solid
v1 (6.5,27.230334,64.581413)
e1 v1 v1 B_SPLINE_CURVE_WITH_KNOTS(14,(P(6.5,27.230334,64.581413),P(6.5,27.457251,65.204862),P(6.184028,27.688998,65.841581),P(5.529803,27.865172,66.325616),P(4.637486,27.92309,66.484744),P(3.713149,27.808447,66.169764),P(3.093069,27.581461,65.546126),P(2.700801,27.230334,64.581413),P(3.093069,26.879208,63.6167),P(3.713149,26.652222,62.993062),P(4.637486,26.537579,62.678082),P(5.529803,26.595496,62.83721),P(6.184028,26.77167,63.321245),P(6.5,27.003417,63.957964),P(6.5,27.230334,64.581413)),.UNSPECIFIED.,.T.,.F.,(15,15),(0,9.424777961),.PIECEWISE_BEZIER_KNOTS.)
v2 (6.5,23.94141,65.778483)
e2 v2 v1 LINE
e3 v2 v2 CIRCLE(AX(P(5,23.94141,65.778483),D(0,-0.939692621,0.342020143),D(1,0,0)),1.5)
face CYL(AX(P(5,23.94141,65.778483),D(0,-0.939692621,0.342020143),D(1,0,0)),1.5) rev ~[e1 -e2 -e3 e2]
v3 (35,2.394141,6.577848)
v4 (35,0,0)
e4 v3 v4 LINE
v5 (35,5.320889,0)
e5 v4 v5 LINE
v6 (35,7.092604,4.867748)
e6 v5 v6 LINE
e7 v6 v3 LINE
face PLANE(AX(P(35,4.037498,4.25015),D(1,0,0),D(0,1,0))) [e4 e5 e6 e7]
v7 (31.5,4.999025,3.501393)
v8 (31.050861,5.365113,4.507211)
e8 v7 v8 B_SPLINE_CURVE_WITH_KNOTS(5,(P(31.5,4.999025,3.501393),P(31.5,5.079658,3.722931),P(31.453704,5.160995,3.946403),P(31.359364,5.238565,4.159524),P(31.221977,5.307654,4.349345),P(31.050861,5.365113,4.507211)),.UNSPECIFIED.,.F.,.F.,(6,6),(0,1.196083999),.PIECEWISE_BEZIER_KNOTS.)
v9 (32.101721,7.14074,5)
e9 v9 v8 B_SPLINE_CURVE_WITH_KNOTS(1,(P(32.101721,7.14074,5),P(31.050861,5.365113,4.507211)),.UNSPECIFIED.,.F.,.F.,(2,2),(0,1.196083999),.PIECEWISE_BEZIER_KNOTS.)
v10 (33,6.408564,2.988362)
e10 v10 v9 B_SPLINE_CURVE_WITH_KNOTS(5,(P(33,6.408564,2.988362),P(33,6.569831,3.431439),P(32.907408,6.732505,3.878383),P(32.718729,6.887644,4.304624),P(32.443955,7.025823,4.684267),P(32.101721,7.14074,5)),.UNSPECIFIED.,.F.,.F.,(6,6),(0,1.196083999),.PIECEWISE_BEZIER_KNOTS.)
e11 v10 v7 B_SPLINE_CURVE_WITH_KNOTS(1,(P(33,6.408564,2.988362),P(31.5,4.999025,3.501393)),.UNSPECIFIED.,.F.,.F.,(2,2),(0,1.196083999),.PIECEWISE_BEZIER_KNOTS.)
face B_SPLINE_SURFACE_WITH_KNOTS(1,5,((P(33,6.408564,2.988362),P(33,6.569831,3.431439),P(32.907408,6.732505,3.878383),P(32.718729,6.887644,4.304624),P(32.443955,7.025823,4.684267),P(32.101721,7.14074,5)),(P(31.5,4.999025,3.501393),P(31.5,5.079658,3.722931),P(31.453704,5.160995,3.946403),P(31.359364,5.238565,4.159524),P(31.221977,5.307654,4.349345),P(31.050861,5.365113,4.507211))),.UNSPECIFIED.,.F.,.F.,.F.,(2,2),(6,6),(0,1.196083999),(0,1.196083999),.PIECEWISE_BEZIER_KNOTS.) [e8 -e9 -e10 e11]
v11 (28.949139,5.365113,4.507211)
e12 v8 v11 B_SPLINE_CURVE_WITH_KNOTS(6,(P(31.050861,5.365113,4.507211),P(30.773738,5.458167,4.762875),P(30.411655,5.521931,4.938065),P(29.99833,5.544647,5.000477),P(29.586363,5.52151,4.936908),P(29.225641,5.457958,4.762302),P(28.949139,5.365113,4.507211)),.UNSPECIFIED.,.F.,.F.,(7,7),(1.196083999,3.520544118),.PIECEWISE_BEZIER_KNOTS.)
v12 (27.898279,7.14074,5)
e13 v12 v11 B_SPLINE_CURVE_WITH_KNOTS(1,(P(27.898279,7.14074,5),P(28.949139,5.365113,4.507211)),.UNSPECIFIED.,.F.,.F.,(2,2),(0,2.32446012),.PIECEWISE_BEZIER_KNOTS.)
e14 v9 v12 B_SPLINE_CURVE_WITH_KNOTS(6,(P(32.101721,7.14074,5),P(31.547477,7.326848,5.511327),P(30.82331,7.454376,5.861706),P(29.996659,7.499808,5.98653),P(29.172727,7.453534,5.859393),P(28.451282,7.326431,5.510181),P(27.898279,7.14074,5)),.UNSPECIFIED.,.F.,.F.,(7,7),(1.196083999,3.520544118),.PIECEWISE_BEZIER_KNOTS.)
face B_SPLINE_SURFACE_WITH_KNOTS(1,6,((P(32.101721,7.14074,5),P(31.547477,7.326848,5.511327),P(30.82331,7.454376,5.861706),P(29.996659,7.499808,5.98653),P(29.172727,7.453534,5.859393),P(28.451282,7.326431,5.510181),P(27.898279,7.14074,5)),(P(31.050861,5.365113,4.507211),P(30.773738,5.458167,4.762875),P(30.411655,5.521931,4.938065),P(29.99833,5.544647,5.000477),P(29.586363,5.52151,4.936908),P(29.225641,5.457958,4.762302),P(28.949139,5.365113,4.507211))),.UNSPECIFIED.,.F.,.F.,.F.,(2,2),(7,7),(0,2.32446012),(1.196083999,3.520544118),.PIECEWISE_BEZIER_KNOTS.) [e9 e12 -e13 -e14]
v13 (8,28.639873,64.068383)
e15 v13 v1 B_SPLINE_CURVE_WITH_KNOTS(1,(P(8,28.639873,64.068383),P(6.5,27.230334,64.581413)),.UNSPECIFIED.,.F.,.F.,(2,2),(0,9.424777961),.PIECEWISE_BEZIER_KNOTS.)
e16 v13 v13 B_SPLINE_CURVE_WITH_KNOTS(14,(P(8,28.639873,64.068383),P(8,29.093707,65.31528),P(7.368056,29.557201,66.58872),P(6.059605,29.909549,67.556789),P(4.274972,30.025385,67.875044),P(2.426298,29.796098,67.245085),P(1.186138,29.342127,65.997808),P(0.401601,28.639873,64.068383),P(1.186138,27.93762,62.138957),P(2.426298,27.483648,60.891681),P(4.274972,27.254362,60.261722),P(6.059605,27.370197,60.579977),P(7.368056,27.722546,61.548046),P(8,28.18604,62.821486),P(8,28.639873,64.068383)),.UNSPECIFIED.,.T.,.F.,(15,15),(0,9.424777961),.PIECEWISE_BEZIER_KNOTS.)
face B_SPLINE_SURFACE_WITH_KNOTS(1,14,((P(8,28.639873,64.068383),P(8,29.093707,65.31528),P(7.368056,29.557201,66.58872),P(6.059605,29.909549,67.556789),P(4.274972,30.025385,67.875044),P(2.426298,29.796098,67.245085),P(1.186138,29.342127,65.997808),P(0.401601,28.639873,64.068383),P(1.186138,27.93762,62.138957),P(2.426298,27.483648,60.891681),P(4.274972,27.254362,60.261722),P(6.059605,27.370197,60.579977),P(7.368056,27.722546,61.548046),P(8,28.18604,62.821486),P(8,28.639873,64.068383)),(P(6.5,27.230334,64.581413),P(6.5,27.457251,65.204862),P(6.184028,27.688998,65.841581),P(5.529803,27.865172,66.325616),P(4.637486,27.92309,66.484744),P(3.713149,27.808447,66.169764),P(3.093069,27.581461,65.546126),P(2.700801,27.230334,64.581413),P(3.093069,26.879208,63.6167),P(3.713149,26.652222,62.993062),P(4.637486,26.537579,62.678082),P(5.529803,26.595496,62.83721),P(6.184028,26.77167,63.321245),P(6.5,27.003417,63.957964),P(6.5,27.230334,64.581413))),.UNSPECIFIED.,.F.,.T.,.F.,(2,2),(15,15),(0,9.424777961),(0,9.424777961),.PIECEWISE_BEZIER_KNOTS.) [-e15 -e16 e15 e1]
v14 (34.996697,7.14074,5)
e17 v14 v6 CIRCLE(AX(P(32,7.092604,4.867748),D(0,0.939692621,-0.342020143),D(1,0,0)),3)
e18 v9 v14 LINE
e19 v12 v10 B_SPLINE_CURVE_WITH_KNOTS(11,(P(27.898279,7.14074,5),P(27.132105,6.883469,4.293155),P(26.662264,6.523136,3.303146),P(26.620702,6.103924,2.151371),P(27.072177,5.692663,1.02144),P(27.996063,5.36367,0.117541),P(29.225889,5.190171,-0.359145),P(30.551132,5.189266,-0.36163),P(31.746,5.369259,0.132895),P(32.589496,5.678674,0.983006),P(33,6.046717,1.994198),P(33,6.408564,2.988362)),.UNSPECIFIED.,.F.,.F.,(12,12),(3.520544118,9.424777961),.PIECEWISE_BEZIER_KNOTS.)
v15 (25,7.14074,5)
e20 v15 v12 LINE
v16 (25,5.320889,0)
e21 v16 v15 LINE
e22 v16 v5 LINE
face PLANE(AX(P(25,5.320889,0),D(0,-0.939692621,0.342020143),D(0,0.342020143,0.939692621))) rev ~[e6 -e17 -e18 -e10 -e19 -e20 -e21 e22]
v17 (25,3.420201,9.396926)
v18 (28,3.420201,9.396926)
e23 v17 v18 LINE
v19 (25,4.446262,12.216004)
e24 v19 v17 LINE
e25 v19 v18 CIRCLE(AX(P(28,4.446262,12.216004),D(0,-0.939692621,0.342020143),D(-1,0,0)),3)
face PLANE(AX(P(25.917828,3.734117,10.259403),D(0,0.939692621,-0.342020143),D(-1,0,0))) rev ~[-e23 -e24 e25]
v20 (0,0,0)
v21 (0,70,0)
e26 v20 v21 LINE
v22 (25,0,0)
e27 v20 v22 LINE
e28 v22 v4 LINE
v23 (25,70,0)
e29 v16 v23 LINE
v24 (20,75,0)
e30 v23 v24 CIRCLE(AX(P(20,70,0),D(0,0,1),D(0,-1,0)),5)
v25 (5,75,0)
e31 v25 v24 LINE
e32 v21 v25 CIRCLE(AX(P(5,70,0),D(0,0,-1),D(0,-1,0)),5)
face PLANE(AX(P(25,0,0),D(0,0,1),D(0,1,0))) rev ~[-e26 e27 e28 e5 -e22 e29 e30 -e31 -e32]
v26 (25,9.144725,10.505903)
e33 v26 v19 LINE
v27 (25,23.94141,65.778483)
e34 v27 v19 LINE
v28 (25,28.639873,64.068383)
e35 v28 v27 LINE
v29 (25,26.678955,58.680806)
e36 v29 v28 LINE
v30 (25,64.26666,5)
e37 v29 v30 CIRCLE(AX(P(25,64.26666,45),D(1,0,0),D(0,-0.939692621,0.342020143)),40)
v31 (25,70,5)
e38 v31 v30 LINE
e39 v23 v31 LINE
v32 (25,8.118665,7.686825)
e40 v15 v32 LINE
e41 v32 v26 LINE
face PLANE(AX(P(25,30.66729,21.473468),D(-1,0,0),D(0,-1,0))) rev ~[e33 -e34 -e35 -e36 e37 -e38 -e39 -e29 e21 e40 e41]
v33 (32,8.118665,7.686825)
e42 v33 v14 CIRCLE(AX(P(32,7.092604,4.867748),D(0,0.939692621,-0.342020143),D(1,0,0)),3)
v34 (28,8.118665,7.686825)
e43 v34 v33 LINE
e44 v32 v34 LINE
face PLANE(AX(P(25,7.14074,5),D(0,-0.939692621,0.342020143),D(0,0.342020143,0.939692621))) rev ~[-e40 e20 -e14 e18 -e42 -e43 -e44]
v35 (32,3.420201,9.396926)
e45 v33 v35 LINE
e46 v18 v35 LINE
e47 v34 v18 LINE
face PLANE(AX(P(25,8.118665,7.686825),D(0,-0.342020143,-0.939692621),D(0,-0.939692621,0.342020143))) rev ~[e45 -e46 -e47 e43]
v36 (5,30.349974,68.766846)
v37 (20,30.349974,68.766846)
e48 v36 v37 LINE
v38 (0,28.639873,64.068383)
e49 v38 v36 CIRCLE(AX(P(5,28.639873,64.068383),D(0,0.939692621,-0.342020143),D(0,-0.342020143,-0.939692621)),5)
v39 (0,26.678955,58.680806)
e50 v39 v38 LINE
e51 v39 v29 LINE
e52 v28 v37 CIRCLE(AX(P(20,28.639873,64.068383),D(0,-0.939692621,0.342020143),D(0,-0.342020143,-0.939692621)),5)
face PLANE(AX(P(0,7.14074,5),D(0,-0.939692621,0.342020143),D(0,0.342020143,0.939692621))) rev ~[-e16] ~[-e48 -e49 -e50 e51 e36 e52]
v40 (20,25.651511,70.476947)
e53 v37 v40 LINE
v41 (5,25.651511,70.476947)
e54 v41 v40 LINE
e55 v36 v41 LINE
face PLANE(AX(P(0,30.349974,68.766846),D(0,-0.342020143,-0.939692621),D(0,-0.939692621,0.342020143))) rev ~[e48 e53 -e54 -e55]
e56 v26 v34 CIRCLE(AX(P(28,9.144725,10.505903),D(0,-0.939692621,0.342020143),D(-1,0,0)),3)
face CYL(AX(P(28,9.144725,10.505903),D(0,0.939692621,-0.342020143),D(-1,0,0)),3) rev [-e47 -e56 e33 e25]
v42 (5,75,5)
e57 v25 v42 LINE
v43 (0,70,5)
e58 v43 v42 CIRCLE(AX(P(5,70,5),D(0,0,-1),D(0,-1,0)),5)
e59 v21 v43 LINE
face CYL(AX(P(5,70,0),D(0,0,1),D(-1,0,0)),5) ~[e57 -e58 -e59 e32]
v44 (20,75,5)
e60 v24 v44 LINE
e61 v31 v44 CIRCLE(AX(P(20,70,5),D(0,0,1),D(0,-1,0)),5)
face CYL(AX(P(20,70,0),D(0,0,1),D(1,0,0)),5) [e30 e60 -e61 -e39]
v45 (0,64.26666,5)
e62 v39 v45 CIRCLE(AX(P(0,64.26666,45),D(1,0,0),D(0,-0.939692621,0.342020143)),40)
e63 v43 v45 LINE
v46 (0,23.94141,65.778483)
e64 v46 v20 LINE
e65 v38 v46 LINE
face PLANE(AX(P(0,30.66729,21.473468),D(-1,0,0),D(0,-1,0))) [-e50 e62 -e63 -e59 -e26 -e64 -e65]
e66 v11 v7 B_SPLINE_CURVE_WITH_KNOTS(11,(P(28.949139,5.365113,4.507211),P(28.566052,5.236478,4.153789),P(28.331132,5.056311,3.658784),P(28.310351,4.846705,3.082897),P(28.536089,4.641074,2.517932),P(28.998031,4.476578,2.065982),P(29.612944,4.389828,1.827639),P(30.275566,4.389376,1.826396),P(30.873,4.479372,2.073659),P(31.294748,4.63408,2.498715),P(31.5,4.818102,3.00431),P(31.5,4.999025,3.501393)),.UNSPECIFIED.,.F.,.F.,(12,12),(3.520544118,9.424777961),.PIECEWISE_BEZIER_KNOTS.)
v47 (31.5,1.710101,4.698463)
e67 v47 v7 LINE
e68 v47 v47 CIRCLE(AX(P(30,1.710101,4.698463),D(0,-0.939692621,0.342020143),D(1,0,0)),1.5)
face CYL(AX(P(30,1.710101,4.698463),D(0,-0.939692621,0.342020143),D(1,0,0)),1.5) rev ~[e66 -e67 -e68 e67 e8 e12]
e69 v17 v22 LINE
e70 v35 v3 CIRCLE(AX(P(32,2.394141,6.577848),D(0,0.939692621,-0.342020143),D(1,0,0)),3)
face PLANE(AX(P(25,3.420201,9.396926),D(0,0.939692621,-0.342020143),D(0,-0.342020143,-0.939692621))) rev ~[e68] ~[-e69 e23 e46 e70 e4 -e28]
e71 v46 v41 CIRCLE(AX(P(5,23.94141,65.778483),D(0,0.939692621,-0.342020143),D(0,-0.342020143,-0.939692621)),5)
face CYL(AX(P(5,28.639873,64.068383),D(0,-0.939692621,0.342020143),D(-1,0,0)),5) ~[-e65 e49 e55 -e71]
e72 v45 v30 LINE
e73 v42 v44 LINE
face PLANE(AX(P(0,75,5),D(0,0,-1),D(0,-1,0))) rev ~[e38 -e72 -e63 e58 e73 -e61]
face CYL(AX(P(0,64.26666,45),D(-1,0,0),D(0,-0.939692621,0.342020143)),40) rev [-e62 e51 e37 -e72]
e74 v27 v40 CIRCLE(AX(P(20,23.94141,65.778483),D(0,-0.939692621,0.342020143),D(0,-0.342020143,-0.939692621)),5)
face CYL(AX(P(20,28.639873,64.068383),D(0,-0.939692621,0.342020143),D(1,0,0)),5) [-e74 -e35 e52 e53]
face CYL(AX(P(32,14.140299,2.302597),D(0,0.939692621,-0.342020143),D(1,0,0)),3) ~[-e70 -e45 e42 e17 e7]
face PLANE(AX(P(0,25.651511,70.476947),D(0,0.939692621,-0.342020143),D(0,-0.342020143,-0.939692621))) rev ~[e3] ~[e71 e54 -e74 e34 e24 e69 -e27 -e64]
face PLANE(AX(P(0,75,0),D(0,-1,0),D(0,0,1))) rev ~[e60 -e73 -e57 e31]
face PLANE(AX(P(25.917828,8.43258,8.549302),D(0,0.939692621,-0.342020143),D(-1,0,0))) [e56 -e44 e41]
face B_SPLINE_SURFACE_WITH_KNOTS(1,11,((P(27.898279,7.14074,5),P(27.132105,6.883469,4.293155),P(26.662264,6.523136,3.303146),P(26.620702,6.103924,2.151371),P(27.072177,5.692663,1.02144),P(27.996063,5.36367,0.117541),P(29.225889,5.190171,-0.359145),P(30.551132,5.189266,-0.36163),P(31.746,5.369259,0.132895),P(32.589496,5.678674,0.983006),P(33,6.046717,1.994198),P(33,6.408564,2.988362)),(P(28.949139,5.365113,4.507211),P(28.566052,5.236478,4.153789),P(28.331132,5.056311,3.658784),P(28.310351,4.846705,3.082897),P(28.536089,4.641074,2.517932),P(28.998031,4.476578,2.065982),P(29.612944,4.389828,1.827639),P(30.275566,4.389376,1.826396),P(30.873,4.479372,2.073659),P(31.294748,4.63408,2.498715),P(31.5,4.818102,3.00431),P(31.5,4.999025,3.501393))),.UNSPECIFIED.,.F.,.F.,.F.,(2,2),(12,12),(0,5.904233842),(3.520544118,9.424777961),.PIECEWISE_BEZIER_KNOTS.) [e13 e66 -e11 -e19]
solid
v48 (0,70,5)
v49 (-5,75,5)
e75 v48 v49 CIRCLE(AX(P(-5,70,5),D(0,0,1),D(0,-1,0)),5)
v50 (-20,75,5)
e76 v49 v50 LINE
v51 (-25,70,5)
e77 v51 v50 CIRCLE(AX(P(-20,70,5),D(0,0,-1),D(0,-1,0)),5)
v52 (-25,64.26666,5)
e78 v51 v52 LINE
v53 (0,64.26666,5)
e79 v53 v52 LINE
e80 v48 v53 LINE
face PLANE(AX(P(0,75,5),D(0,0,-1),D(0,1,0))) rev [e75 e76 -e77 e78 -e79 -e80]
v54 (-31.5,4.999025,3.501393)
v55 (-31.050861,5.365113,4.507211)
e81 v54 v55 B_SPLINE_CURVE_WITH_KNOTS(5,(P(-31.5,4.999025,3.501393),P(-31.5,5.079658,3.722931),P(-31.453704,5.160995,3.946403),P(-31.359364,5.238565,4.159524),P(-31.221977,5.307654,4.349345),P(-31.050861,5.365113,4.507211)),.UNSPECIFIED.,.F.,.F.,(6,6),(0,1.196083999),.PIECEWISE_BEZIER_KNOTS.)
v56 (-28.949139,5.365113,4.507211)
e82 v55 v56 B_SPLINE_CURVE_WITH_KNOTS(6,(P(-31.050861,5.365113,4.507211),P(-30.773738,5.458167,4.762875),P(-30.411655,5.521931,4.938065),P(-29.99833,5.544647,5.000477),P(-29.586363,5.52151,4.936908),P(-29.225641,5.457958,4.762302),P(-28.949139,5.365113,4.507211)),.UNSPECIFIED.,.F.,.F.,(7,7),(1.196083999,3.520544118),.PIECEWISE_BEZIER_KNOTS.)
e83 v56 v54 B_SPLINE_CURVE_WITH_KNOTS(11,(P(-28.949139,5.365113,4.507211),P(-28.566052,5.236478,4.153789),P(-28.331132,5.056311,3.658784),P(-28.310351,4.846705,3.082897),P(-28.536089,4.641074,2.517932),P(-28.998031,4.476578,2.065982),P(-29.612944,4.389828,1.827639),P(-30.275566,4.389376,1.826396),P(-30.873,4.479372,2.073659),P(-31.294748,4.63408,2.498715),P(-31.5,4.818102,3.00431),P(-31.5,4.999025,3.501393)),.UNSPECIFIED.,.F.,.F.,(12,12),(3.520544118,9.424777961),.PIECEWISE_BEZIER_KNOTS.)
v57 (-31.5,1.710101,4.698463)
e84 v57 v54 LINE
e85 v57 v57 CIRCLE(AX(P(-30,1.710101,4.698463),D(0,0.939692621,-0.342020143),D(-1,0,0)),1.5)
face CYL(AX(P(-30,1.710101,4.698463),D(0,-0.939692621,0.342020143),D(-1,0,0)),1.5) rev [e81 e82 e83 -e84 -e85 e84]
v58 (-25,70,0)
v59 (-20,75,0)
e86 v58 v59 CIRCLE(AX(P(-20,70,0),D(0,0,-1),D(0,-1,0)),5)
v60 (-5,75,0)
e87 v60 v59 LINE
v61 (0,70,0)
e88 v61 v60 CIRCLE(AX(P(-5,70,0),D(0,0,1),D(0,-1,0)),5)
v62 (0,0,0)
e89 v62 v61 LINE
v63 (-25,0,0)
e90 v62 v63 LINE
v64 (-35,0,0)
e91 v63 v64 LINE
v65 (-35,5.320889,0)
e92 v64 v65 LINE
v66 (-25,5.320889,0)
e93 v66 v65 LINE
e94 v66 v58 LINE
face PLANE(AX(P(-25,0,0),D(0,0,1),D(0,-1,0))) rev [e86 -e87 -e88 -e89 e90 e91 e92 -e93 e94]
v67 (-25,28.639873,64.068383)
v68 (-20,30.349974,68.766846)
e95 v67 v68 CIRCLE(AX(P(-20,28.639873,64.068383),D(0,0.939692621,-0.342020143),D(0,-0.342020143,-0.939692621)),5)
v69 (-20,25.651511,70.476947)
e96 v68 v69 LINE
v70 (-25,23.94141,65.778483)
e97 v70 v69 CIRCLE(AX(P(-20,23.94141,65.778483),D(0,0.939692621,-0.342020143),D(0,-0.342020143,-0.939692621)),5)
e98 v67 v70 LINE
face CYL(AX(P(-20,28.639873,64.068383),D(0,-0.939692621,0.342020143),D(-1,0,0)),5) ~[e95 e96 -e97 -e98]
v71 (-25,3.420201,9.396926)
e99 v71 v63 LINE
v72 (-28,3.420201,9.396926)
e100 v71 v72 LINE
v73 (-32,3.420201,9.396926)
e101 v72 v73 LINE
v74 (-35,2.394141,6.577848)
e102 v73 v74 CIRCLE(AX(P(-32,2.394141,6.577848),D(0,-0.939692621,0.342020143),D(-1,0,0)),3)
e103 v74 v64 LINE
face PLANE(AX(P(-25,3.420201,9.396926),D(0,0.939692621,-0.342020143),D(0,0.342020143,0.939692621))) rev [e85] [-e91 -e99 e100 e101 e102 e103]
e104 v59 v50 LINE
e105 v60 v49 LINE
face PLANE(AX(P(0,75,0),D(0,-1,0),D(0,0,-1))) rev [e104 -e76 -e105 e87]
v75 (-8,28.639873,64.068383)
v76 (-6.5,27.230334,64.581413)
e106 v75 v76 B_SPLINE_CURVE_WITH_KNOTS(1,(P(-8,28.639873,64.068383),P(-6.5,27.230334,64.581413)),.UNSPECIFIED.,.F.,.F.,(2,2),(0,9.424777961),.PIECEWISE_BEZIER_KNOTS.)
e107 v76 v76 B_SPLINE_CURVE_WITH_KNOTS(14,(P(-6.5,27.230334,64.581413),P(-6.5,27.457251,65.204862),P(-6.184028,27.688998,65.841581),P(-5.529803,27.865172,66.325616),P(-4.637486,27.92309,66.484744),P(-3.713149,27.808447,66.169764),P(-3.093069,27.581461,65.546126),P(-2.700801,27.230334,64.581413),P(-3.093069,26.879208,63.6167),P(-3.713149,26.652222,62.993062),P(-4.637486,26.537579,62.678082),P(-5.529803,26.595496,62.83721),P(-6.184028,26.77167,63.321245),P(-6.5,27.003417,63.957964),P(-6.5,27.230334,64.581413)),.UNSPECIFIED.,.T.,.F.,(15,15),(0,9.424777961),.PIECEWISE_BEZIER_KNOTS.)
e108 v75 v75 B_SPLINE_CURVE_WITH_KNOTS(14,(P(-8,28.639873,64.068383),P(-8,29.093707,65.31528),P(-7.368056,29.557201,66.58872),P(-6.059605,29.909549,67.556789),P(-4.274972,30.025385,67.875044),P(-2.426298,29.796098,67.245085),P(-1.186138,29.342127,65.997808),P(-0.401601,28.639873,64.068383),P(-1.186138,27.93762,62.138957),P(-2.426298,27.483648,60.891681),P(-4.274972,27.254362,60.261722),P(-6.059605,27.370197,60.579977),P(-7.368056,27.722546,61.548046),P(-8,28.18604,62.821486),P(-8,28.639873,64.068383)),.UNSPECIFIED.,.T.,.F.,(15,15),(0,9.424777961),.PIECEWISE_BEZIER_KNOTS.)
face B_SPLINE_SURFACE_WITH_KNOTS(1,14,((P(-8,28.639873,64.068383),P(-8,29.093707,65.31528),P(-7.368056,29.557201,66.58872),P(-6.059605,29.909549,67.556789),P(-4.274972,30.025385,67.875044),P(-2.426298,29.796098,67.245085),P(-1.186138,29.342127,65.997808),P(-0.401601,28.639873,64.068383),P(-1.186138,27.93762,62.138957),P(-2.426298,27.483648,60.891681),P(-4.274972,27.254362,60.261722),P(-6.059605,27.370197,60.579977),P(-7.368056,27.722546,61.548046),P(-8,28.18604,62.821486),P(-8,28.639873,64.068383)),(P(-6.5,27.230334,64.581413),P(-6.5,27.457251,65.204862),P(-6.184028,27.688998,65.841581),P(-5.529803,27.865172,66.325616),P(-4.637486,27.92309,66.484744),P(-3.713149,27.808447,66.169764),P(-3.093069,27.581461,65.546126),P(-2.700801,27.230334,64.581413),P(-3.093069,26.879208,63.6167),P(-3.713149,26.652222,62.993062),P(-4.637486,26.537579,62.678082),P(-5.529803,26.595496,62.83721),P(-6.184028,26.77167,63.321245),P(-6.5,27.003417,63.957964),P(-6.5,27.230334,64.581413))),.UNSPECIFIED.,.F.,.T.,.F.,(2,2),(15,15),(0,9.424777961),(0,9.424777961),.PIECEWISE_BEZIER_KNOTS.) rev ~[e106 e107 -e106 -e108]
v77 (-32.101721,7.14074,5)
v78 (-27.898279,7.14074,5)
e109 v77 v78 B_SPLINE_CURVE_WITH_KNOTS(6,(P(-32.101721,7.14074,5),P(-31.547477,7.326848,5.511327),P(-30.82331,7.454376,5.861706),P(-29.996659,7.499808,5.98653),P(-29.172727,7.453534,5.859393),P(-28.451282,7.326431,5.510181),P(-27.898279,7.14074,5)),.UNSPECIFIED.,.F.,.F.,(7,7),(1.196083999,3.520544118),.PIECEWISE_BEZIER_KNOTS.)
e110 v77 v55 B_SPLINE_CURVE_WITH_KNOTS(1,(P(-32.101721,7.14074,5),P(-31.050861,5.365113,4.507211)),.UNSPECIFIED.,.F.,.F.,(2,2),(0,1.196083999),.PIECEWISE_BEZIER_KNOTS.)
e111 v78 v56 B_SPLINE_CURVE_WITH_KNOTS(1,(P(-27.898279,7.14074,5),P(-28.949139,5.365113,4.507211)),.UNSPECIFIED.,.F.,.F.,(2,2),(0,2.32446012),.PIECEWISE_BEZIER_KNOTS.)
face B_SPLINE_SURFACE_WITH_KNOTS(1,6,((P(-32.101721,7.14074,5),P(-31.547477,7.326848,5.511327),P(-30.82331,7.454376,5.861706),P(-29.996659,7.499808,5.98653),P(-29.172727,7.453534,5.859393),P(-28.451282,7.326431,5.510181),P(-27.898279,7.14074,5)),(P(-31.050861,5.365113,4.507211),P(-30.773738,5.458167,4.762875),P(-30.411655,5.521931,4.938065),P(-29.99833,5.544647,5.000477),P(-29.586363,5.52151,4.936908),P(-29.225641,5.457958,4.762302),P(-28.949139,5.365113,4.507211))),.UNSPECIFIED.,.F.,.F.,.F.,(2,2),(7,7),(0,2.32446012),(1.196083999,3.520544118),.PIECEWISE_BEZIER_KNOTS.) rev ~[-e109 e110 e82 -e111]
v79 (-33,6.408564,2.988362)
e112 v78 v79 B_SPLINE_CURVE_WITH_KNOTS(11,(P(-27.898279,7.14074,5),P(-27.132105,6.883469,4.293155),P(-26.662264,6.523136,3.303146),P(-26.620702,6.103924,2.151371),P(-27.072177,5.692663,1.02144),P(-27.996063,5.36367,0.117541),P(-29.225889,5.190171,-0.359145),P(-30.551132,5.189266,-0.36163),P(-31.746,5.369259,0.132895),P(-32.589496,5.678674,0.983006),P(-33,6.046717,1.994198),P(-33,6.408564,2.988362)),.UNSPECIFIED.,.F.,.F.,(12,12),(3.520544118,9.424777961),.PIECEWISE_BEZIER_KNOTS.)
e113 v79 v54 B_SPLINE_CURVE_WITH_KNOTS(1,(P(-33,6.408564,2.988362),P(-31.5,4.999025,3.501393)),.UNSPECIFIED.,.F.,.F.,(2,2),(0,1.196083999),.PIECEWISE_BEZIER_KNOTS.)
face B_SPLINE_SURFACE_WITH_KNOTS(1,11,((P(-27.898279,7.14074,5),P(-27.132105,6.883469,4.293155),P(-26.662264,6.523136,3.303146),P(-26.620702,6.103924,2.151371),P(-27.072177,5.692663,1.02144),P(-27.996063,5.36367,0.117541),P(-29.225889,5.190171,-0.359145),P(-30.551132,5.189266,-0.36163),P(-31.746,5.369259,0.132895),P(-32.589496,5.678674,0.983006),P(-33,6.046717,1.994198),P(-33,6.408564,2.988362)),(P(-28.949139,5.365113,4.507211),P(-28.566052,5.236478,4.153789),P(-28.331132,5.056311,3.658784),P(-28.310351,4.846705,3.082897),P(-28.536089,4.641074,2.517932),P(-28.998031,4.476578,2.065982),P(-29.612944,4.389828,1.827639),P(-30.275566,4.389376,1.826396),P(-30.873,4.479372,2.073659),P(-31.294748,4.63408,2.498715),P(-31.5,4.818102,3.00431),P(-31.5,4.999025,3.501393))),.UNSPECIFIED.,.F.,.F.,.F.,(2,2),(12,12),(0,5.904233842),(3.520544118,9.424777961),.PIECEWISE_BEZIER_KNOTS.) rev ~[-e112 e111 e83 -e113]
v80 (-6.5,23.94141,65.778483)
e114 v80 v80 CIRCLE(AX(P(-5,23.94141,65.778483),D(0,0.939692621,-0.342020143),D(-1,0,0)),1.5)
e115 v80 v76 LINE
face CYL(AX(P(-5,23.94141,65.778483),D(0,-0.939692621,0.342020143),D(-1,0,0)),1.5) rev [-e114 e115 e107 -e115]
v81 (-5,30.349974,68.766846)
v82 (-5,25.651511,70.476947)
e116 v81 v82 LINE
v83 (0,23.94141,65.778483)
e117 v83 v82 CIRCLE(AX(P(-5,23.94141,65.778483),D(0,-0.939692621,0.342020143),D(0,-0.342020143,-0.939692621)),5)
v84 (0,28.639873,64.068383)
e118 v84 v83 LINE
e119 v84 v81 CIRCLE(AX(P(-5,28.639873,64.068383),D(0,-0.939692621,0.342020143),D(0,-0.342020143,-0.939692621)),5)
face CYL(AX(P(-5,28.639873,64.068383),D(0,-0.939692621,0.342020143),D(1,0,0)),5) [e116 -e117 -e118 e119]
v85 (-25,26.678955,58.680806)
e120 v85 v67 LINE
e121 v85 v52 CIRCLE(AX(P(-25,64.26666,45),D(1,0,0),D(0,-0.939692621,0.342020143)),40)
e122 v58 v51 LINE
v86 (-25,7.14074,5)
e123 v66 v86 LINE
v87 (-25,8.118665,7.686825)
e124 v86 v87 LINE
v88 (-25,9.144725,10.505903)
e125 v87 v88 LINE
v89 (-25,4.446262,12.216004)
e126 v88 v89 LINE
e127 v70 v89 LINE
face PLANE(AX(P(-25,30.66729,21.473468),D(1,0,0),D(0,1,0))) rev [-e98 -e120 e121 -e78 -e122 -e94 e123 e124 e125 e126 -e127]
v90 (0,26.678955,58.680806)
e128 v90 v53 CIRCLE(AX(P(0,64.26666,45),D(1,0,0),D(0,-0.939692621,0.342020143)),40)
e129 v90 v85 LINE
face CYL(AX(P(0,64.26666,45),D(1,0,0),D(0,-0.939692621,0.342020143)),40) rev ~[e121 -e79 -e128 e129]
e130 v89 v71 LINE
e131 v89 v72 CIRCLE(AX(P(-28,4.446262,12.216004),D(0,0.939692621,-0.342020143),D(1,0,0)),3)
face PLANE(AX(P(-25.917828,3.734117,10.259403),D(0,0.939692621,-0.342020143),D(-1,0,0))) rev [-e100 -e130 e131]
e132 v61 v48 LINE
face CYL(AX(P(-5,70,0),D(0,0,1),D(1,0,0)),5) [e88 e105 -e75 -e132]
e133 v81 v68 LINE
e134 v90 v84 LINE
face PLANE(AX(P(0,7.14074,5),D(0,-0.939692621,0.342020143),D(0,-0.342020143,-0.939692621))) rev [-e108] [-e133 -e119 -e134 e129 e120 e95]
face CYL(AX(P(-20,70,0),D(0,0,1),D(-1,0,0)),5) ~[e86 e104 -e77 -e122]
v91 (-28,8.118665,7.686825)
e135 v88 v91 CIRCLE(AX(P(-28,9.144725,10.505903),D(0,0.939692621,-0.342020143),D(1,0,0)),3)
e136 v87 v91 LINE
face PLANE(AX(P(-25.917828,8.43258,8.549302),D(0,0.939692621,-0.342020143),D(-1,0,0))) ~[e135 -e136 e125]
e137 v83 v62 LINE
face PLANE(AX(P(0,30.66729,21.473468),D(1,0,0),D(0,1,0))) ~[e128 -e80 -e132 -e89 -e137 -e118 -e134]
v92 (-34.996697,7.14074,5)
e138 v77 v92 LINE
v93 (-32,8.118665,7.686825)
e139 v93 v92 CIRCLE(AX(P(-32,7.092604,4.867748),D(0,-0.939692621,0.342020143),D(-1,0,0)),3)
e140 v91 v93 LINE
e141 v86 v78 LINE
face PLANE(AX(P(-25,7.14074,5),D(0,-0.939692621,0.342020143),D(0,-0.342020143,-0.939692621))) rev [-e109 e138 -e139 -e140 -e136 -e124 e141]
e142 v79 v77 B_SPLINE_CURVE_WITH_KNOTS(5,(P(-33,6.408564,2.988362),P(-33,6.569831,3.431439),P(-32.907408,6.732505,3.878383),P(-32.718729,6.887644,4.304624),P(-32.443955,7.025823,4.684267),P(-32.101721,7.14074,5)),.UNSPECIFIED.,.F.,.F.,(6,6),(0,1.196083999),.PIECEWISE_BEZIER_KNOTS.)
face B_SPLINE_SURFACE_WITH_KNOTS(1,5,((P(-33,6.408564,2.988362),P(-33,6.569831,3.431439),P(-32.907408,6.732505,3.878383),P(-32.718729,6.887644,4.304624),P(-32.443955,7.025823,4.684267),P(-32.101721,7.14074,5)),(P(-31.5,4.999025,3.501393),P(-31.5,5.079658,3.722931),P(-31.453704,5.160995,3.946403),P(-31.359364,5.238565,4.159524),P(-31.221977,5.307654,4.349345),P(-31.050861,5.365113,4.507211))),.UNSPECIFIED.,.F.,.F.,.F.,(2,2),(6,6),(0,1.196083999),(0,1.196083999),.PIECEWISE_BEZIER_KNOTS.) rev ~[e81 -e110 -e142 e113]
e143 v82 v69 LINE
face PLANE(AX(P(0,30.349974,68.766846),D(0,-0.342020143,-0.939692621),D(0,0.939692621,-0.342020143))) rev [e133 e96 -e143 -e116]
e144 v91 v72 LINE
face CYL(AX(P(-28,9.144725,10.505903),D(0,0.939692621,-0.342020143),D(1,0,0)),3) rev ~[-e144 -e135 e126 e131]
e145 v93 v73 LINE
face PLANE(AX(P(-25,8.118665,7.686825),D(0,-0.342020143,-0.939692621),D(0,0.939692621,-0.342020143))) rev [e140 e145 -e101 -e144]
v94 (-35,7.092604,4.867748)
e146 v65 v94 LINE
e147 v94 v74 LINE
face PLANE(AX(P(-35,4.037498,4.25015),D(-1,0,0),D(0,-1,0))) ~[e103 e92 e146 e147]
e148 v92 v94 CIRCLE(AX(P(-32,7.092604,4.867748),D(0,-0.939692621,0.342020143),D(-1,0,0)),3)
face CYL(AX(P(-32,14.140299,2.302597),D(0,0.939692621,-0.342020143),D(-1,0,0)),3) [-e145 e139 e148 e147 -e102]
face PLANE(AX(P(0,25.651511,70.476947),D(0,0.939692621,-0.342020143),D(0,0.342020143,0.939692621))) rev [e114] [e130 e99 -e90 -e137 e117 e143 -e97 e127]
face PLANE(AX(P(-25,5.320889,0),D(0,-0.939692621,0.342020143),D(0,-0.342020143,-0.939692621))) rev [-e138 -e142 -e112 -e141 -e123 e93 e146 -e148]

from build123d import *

# Parameters (mm, degrees)
F1_DEPTH    = 25
F3_DEPTH    = 10
F4_R        = 1.5
F5_DEPTH    = 25
F6_SIZE     = 1.5
F7_T1_DEPTH = 25
F8_R        = 5
F9_T1_DEPTH = 5
F9_T3_DEPTH = 20


# Not quite as in the source:
# - a fillet or chamfer that OpenCascade refuses, or shapes differently, is made with other operations: its cross-section is extruded or revolved along the edge and cut away or added
# - a feature names something its author has since deleted; it is built from what else it names


with BuildPart() as f1:
    # F0 (on Right) → F1 (new body)
    with BuildSketch(Plane.YZ):
        Polygon((25.6515107494, 70.4769465589), (0, 0), (75, 0), (75, 5), (7.1407400337, 5), (30.3499738534, 68.7668458423), align=None)
    extrude(amount=F1_DEPTH)

    # F2 (on face) → F3 (join)
    with BuildSketch(Plane.YZ.offset(25)):
        Polygon((8.1186645372, 7.6868254912), (3.4202014333, 9.3969262079), (0, 0), (5.3208888624, 0), (7.1407400337, 5), align=None)
    extrude(amount=F3_DEPTH)

    # F4 (on face) → F5 (cut)
    with BuildSketch(Plane(origin=(0, 0, 0), x_dir=(1, 0, 0), z_dir=(0, -0.9396926208, 0.3420201433))):
        with Locations((30, 5)):
            Circle(F4_R)
        with Locations((5, 70)):
            Circle(F4_R)
    extrude(amount=-F5_DEPTH, mode=Mode.SUBTRACT)

    # F6
    f6_edges = [f1.edges().sort_by_distance(p)[0] for p in [
        (28.5, 6.408564, 2.988362),
        (3.5, 28.639873, 64.068383),
    ]]
    chamfer(f6_edges, length=F6_SIZE)

    # F7: fillet of radius 40 on 1 edges, made by hand

    # F7_s2 → F7_t1 (join)
    with BuildSketch(Plane.YZ):
        with BuildLine():
            ThreePointArc((26.678955472, 58.680805733), (31.5005785318, 22.056942546), (64.2666603034, 5))
            Line((64.2666603034, 5), (7.1407400337, 5))
            Line((7.1407400337, 5), (26.678955472, 58.680805733))
        make_face()
    extrude(amount=F7_T1_DEPTH)

    # F8
    f8_edges = [f1.edges().sort_by_distance(p)[0] for p in [
        (25, 28.000742, 69.621896),
        (0, 28.000742, 69.621896),
        (0, 75, 2.5),
        (25, 75, 2.5),
    ]]
    fillet(f8_edges, radius=F8_R)

    # F9: fillet of radius 3 on 2 edges, made by hand

    # F9_s2 → F9_t1 (join)
    with BuildSketch(Plane(origin=(0, 4.6984631039, -1.7101007166), x_dir=(1, 0, 0), z_dir=(0, -0.9396926208, 0.3420201433))):
        with BuildLine():
            ThreePointArc((25, 13), (25.8786796564, 10.8786796564), (28, 10))
            Line((28, 10), (25, 10))
            Line((25, 10), (25, 13))
        make_face()
    extrude(amount=F9_T1_DEPTH)

    # F9_s4 → F9_t3 (cut)
    with BuildSketch(Plane(origin=(0, 11.7461577598, -4.2752517916), x_dir=(1, 0, 0), z_dir=(0, -0.9396926208, 0.3420201433))):
        with BuildLine():
            ThreePointArc((35, 7), (34.1213203436, 9.1213203436), (32, 10))
            Line((32, 10), (35, 10))
            Line((35, 10), (35, 7))
        make_face()
    extrude(amount=F9_T3_DEPTH, mode=Mode.SUBTRACT)


with BuildPart() as f10_1:
    # F10: instance of F1
    add(f1.part.mirror(Plane.YZ))


solid = Compound([f1.part, f10_1.part])
